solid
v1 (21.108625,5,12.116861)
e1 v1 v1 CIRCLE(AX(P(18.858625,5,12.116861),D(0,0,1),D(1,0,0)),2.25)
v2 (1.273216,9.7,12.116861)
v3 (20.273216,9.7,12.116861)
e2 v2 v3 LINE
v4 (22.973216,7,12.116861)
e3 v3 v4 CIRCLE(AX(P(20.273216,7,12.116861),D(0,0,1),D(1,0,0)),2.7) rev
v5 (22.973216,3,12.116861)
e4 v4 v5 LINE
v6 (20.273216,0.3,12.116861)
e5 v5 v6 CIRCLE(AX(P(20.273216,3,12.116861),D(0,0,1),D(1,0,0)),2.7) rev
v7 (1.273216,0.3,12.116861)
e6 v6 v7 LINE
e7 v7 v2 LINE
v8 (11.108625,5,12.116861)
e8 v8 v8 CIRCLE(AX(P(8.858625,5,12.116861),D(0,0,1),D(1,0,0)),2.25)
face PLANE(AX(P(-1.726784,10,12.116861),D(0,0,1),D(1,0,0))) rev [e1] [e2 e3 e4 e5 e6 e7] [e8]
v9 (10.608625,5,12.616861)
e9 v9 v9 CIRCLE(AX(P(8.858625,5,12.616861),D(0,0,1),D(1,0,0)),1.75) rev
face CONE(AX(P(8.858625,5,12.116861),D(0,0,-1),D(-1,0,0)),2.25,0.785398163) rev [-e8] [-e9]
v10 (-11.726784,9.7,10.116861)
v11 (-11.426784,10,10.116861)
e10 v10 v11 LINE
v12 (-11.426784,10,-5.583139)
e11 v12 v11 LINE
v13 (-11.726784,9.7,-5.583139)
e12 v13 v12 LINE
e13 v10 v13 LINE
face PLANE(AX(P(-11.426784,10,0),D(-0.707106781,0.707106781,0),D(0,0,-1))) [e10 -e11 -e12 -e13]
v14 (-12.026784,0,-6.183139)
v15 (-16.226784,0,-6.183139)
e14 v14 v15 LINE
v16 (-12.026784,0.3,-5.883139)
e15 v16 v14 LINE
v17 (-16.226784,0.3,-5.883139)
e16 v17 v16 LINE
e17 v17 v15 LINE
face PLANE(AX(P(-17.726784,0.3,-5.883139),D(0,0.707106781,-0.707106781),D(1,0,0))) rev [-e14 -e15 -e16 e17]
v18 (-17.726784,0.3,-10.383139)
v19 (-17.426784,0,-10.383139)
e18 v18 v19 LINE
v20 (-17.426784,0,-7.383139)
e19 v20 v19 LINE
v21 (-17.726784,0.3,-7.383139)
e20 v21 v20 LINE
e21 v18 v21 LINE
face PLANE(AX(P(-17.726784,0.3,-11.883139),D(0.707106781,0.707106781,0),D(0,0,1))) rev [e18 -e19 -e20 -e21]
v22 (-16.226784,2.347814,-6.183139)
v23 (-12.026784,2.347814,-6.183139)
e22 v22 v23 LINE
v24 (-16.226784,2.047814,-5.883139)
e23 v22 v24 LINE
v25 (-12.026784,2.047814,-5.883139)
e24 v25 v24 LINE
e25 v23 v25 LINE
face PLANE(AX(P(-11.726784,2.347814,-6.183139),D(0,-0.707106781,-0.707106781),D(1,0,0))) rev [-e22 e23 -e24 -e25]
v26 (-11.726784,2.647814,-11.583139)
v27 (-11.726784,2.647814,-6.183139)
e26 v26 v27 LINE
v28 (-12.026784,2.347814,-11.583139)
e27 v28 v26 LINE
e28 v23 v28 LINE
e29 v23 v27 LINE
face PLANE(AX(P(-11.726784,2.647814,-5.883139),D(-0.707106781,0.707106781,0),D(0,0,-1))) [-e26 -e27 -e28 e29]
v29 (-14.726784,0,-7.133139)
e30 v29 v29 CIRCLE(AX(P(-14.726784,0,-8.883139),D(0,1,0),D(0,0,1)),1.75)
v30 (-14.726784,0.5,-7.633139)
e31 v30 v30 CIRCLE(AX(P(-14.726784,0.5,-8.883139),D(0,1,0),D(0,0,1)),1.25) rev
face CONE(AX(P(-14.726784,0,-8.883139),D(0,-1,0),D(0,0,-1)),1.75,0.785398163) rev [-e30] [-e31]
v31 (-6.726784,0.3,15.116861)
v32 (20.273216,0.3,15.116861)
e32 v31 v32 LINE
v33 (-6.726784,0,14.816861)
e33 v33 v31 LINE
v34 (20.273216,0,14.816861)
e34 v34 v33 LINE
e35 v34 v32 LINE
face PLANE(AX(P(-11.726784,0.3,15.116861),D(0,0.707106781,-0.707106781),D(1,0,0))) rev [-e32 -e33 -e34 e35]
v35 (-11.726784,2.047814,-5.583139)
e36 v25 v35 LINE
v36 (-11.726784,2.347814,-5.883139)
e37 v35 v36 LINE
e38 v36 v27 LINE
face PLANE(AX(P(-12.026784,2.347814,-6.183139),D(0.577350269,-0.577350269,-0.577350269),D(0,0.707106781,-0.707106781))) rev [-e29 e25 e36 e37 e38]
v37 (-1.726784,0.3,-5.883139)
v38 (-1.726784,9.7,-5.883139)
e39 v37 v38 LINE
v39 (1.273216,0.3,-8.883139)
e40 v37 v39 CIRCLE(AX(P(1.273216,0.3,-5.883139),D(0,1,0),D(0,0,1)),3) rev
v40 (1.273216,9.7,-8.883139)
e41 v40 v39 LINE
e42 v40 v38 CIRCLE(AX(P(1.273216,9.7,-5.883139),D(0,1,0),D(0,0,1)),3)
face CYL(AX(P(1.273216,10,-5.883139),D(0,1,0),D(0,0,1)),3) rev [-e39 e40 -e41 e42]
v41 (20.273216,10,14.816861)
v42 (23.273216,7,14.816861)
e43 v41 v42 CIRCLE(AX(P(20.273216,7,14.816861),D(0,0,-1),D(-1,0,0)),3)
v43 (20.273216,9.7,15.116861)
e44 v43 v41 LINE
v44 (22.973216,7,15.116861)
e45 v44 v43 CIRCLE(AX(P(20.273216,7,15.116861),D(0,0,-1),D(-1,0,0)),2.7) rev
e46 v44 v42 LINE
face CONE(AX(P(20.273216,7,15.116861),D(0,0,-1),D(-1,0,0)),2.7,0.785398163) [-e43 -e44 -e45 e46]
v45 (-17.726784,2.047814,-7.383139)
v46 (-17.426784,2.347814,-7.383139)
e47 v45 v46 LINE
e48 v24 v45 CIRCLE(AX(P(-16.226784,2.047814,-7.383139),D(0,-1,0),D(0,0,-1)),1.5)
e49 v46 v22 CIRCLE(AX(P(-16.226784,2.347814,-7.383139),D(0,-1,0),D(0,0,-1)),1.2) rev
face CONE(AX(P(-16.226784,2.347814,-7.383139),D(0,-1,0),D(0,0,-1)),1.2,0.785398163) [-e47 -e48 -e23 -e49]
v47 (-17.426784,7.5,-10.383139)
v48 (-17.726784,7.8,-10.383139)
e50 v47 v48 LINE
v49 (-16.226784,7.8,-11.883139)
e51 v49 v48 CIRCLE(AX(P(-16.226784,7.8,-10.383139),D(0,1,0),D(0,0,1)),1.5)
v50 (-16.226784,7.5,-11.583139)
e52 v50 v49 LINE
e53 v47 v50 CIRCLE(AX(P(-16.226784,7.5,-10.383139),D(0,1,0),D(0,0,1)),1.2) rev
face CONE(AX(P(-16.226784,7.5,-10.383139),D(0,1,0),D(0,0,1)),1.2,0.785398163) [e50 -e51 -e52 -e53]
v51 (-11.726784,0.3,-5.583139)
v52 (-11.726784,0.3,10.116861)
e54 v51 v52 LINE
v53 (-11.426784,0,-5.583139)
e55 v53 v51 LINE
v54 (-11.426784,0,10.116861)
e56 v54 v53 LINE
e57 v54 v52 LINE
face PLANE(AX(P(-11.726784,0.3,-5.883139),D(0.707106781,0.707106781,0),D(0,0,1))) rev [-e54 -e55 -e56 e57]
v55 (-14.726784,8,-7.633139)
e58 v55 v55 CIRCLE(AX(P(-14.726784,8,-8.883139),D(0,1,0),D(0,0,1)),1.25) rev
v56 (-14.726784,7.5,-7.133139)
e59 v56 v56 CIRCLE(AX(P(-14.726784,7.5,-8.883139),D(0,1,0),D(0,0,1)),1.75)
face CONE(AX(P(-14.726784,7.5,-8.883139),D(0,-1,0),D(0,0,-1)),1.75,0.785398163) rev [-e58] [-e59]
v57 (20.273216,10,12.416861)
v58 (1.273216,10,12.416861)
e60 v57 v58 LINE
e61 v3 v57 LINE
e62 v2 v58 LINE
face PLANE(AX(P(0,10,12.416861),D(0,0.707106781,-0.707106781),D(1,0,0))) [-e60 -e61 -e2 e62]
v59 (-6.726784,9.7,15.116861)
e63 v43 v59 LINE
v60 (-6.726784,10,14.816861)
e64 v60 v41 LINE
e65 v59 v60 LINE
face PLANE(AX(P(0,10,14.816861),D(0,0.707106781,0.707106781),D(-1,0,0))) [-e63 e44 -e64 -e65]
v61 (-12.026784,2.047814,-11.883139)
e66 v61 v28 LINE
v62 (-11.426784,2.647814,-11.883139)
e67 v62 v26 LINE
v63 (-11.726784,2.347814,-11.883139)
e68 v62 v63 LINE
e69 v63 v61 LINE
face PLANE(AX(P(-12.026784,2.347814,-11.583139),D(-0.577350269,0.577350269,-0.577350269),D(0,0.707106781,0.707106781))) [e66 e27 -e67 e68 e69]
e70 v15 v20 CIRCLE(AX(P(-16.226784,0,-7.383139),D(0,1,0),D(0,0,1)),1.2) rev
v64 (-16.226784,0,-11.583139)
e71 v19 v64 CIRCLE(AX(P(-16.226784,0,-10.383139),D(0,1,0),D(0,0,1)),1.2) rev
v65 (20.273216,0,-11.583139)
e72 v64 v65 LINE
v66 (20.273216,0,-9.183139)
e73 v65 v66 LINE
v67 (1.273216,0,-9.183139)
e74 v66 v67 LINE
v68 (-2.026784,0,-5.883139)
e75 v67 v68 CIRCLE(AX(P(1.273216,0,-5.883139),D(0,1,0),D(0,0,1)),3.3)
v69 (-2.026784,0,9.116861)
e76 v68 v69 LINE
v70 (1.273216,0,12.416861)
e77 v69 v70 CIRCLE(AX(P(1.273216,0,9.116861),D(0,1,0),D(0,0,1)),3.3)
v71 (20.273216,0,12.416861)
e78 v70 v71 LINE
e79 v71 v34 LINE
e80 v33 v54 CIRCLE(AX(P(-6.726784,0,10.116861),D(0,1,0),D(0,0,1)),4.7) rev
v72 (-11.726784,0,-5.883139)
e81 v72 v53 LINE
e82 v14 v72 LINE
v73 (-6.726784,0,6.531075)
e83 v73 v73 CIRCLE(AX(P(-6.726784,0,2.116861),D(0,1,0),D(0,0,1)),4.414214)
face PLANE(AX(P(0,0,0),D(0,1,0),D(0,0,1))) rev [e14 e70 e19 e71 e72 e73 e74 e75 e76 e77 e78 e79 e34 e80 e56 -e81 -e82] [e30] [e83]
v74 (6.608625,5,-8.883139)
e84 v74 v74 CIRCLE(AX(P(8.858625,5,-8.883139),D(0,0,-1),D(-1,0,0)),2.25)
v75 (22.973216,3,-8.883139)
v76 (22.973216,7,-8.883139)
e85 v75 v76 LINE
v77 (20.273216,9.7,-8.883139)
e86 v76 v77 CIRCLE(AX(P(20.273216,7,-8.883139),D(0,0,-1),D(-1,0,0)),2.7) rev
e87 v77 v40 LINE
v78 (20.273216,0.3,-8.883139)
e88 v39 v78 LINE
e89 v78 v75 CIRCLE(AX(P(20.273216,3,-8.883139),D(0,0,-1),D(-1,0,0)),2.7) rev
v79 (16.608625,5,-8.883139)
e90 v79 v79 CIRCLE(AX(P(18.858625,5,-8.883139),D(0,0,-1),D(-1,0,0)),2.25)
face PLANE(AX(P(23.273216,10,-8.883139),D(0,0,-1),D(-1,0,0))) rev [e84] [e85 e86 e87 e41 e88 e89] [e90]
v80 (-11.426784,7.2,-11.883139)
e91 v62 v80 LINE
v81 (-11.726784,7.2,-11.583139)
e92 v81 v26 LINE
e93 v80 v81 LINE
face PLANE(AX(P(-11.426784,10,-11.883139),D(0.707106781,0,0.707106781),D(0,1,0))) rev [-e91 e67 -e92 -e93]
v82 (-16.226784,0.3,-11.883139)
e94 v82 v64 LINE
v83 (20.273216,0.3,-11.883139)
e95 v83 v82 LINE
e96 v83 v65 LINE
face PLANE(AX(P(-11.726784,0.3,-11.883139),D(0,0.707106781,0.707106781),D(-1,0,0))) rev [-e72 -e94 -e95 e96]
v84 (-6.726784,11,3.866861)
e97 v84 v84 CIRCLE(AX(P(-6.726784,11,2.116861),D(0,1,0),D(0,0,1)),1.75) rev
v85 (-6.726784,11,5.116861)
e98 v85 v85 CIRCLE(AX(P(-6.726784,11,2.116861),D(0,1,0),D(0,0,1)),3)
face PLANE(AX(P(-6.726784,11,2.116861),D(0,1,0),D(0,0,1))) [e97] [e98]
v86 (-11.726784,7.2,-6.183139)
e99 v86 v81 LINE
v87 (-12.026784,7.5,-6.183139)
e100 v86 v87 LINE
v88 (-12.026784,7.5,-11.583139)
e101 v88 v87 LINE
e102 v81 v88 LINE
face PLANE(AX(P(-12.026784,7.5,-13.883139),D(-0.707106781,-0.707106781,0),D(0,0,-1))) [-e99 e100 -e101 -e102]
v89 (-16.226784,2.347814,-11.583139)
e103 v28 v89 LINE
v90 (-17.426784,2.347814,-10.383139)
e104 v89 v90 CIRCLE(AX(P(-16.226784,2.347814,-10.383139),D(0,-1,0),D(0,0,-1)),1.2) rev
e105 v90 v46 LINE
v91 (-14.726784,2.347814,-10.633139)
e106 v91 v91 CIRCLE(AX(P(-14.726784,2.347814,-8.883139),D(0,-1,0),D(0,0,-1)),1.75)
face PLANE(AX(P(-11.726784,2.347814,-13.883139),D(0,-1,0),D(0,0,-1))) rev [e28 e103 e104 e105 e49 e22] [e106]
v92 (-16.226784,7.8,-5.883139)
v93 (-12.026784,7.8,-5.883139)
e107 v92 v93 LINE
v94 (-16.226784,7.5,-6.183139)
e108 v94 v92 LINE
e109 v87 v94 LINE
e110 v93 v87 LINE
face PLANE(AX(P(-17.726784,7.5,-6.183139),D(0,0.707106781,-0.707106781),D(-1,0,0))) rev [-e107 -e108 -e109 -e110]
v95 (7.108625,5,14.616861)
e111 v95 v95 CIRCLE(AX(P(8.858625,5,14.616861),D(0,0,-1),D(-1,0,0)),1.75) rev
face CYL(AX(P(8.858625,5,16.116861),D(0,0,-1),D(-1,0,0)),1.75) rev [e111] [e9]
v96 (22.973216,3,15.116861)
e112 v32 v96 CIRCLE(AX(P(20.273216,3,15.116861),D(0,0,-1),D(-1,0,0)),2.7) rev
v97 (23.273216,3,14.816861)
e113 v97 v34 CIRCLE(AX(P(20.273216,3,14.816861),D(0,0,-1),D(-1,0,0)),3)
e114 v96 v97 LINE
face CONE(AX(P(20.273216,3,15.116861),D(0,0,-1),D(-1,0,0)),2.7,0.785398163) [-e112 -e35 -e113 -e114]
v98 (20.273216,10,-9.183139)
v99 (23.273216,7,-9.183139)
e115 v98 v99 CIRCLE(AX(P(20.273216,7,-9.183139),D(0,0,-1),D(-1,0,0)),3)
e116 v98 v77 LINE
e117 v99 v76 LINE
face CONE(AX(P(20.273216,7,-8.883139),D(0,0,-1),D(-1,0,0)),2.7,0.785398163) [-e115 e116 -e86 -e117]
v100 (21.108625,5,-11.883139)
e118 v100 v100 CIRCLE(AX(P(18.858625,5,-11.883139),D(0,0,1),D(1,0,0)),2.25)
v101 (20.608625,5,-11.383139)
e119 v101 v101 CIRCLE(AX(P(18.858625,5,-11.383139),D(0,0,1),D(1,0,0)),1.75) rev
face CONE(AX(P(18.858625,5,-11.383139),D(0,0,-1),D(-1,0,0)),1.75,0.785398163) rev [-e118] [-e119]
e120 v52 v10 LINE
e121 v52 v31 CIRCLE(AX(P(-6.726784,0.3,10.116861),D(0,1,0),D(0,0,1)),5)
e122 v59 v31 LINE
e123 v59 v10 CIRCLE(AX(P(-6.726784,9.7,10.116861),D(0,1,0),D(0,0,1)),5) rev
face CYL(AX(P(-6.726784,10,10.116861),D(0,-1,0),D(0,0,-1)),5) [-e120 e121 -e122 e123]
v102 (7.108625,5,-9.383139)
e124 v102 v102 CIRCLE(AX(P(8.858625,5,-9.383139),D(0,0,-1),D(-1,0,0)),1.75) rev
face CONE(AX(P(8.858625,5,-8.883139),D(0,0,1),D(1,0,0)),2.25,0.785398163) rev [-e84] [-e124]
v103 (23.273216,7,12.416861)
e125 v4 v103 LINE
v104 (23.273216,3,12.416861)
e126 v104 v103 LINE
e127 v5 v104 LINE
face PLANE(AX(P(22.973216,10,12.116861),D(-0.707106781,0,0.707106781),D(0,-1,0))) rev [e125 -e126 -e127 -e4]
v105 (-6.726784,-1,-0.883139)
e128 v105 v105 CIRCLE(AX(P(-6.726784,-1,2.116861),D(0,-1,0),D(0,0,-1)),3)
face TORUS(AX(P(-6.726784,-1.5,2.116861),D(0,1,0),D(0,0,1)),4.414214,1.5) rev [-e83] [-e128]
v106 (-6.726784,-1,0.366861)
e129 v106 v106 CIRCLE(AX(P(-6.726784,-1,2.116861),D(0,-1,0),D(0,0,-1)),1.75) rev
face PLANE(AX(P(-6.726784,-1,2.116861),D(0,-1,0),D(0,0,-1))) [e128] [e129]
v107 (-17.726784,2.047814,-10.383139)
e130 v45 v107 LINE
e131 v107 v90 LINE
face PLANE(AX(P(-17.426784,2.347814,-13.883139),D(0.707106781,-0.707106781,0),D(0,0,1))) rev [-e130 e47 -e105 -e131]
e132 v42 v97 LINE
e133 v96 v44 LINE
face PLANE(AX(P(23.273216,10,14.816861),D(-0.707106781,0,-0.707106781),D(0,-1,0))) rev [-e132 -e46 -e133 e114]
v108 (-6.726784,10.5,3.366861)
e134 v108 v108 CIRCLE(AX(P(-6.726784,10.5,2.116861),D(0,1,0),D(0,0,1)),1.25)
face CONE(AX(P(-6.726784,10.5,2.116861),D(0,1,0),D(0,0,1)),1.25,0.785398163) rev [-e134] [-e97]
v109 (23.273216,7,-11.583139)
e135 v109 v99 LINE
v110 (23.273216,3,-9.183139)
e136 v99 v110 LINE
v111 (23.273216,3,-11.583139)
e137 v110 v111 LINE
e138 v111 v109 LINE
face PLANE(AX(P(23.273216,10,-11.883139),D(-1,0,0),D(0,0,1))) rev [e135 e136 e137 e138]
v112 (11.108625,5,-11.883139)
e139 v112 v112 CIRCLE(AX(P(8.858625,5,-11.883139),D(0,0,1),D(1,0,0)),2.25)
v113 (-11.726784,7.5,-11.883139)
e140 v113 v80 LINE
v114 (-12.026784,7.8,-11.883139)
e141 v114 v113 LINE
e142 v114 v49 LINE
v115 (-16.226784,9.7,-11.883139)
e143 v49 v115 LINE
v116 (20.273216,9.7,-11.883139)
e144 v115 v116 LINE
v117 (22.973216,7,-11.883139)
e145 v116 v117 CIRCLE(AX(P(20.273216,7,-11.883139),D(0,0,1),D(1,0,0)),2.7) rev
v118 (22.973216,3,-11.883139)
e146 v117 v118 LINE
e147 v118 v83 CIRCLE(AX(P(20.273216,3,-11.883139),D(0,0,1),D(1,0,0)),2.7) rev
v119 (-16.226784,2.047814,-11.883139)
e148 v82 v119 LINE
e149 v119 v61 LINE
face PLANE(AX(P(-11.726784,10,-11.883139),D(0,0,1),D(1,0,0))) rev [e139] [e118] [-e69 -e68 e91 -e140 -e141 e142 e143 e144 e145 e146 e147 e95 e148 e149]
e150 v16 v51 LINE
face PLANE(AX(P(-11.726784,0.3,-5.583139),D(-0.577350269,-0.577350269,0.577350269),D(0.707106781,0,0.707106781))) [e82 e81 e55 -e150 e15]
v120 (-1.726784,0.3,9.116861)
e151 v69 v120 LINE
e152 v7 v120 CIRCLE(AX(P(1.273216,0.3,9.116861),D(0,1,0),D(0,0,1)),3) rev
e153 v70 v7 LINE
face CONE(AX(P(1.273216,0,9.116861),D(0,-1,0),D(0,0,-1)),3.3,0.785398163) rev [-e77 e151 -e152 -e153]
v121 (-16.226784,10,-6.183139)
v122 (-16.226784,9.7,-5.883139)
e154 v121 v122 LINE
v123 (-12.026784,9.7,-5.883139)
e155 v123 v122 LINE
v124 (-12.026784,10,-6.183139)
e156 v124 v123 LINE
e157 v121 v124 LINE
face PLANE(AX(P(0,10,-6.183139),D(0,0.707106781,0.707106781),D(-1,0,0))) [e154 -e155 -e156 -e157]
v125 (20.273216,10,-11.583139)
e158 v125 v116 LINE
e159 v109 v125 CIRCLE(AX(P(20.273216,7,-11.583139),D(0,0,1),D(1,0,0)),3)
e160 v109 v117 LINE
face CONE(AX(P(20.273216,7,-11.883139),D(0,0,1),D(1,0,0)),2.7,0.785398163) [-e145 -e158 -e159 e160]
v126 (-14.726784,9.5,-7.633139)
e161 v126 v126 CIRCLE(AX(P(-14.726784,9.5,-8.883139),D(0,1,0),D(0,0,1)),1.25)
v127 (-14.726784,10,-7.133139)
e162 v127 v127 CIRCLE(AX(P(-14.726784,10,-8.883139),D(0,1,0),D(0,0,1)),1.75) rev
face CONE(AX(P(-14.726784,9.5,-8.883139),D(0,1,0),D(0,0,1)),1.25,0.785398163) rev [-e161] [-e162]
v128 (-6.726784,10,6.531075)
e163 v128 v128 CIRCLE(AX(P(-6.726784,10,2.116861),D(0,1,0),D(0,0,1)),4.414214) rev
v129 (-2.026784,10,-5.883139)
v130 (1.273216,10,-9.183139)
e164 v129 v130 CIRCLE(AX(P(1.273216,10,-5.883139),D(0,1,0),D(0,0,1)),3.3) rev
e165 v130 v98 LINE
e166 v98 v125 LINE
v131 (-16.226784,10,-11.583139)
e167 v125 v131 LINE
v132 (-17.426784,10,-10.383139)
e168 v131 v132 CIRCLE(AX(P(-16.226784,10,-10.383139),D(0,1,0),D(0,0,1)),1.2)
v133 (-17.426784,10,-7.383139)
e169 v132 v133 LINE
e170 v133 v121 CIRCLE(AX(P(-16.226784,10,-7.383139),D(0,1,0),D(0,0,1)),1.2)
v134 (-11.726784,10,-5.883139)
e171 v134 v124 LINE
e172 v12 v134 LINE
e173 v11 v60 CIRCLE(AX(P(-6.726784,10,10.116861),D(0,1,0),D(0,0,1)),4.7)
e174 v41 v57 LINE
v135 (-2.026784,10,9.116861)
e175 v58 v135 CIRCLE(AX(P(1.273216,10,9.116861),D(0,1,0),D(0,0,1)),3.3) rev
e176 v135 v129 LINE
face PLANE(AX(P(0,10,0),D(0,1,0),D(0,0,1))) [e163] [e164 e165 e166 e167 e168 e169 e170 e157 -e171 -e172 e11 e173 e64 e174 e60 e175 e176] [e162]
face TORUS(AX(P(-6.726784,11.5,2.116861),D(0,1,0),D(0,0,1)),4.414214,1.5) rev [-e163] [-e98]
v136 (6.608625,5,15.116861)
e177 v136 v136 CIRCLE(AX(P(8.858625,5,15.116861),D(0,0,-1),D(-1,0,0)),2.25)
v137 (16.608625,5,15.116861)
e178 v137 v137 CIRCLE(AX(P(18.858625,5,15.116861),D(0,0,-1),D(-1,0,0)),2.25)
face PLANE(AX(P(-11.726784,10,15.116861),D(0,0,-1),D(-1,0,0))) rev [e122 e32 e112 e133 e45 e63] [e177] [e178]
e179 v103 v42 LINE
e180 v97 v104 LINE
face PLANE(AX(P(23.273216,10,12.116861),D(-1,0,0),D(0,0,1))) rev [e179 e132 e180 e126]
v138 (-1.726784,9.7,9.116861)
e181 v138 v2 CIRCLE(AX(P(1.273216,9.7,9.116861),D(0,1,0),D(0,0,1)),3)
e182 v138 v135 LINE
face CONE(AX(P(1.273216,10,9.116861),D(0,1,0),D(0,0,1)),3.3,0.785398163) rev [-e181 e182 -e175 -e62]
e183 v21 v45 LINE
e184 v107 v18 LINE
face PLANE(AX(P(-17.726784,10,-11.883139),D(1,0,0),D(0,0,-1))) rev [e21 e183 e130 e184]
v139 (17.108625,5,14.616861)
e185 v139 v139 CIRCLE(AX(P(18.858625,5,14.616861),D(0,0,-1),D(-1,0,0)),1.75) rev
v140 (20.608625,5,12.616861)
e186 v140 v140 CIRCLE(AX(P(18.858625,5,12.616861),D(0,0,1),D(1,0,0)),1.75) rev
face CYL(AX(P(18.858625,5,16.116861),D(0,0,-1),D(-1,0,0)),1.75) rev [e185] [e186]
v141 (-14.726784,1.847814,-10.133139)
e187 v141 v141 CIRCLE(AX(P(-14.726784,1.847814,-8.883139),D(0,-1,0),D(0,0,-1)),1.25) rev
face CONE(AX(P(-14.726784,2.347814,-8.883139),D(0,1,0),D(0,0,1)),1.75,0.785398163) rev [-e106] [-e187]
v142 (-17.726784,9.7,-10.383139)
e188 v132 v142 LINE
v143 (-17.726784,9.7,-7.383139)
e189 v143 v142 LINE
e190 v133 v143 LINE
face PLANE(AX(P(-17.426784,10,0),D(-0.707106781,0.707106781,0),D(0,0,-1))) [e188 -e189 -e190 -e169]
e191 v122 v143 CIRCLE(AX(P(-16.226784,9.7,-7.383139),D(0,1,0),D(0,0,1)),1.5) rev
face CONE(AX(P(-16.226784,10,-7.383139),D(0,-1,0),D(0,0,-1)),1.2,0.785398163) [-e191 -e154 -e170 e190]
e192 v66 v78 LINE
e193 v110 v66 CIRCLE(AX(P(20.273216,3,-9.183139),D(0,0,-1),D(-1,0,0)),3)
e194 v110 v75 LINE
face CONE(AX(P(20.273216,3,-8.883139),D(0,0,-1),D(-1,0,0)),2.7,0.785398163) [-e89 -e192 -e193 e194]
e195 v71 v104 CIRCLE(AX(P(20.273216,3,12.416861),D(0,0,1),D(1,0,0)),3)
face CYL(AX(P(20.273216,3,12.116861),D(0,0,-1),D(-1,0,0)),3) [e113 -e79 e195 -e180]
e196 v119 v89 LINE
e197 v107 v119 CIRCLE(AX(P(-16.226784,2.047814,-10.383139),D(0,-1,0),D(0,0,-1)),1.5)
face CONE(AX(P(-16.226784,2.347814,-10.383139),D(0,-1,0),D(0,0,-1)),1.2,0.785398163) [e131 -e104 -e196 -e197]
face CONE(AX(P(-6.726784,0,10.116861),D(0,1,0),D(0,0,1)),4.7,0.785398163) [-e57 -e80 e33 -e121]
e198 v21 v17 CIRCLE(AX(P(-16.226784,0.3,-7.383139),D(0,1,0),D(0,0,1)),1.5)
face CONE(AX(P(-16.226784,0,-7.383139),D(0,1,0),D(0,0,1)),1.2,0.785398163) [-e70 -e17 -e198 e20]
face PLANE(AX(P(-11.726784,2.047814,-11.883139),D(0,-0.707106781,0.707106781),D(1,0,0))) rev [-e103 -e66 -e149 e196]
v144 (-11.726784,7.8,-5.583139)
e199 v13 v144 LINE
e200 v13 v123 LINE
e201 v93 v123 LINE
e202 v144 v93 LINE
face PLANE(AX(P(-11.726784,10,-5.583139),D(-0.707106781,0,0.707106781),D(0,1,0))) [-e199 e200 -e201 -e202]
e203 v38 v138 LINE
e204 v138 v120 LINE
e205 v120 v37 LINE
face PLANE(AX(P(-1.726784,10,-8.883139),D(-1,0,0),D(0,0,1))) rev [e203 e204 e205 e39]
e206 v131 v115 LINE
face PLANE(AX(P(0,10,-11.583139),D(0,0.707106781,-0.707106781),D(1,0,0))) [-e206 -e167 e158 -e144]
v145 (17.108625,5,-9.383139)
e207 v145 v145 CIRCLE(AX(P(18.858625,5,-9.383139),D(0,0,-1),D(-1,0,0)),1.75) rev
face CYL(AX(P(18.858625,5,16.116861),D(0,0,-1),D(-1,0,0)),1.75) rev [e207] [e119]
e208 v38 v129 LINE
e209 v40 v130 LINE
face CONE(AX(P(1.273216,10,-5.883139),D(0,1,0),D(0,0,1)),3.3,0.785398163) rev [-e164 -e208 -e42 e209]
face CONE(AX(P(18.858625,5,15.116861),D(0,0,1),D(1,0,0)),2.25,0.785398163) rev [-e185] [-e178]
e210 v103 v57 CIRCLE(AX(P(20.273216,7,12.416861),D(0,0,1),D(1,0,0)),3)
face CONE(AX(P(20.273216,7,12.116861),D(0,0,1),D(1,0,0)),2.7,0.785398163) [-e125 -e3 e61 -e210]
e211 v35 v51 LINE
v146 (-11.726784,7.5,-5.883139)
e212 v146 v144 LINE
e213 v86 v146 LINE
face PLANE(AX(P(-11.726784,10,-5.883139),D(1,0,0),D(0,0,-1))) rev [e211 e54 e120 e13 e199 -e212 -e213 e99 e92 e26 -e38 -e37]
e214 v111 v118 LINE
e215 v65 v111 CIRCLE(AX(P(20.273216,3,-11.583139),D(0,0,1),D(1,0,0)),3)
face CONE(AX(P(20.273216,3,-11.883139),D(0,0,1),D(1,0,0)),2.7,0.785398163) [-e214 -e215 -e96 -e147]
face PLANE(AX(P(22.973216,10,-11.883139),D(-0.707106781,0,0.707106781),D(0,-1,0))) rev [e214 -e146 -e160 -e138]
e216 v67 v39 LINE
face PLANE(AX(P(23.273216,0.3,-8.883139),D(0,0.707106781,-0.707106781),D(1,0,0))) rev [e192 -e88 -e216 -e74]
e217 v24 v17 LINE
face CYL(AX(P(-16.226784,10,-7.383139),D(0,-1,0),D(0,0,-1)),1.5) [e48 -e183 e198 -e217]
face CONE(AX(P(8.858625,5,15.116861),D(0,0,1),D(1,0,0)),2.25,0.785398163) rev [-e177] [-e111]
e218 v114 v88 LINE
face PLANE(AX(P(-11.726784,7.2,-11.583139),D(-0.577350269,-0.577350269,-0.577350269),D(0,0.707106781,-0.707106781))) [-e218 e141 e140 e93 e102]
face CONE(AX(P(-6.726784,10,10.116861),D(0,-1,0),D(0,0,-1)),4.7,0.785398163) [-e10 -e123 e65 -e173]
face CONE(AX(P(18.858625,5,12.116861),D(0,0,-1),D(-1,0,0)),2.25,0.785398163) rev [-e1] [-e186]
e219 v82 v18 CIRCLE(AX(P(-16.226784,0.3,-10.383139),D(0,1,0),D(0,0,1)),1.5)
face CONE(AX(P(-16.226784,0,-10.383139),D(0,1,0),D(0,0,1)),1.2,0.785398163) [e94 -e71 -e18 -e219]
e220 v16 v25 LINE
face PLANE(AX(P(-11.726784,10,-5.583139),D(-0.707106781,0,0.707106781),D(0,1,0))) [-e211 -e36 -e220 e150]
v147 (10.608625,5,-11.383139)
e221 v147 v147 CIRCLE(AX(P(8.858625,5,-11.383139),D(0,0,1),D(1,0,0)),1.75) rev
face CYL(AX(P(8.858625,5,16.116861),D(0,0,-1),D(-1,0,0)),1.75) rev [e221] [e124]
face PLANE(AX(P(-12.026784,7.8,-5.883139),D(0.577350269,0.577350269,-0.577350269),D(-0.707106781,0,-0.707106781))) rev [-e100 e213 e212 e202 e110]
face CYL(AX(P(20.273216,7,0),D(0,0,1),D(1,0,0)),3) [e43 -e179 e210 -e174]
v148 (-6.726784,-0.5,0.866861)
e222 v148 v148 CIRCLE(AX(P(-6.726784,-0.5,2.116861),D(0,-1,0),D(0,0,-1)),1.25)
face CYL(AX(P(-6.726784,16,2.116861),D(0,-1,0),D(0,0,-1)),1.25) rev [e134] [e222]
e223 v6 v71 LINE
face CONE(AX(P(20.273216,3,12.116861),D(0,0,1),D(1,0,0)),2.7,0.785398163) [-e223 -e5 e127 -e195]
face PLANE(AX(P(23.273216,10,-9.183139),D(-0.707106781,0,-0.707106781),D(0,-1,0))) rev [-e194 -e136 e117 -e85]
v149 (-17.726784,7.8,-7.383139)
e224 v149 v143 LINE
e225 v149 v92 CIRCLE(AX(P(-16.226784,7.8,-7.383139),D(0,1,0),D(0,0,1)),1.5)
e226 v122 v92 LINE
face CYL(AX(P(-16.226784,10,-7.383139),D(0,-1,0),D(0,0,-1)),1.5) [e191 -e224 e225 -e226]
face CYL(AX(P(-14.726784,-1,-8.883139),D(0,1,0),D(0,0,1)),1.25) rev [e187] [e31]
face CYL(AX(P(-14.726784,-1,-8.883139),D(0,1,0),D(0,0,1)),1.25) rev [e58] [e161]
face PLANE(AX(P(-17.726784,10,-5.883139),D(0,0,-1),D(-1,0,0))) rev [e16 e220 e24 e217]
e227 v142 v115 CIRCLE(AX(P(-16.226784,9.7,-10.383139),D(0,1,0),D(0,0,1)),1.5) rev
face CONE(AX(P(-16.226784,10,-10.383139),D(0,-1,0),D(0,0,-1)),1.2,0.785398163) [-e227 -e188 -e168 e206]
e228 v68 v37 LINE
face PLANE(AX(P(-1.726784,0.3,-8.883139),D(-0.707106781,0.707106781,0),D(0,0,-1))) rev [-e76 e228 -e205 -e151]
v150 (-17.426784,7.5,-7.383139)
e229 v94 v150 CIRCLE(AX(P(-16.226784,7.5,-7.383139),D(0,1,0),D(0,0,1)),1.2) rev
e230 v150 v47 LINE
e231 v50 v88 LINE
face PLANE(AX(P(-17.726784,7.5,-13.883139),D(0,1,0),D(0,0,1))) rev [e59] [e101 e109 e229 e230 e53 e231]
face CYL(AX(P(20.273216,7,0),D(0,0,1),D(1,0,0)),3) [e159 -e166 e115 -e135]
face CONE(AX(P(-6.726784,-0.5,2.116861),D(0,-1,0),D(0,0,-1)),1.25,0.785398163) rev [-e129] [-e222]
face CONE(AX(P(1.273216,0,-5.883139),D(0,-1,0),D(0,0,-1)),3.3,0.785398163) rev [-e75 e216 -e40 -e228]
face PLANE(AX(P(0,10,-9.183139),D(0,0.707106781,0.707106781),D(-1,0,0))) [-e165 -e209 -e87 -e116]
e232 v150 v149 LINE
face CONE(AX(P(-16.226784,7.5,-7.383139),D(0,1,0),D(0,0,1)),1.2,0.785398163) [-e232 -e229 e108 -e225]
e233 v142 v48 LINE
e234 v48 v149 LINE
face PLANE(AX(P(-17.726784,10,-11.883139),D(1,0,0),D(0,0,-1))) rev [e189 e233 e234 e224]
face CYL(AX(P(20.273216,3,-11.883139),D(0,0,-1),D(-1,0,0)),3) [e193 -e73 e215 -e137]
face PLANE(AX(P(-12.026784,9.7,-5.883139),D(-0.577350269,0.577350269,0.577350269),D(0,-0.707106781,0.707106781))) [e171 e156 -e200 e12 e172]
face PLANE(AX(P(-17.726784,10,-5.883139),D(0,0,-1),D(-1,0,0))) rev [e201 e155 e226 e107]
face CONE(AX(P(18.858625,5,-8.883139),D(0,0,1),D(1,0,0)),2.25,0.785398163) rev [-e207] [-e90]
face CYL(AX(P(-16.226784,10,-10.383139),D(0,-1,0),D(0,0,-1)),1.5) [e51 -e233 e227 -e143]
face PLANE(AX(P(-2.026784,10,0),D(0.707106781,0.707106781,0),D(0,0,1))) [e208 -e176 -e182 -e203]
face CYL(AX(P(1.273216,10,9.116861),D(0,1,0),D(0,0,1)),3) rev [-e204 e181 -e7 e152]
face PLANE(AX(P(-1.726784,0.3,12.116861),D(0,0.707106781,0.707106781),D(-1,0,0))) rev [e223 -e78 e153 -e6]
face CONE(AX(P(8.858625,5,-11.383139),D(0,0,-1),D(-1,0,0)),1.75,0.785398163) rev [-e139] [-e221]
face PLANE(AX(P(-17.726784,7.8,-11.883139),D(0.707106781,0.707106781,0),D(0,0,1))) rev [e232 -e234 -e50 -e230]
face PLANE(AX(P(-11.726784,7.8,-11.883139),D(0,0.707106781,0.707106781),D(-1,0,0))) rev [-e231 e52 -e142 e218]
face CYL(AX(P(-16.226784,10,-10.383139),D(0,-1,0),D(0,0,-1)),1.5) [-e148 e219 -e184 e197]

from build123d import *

# Parameters (mm, degrees)
EXTRUDE_1_DEPTH     = 10
SKETCH_2_R          = 1.75
CUT_EXTRUDE_1_DEPTH = 28
SKETCH_3_W          = 6
SKETCH_3_H          = 5.152186346
CUT_EXTRUDE_2_DEPTH = 8
SKETCH_4_R          = 1.25
CUT_EXTRUDE_3_DEPTH = 11
FILLET_1_R          = 3
FILLET_2_R          = 5
FILLET_3_R          = 1.5
SKETCH_5_R          = 3
EXTRUDE_2_DEPTH     = 1
EXTRUDE_START       = 1
SKETCH_6_R          = 3
EXTRUDE_3_DEPTH     = 1
FILLET_4_R          = 1.5
SKETCH_7_R          = 1.25
CUT_EXTRUDE_4_DEPTH = 17
CHAMFER_1_SIZE      = 0.5
FILLET_5_R          = 3
CHAMFER_2_SIZE      = 0.3


with BuildPart() as part:
    # 草图1 → 凸台-拉伸1 (new body)
    with BuildSketch(Plane(origin=(0, 0, 0), x_dir=(1, 0, 0), z_dir=(0, 1, 0))):
        Polygon((23.273216446, 11.883138654), (23.273216446, 8.883138654), (-1.726783554, 8.883138654), (-1.726783554, -12.116861346), (23.273216446, -12.116861346), (23.273216446, -15.116861346), (-11.726783554, -15.116861346), (-11.726783554, 5.883138654), (-17.726783554, 5.883138654), (-17.726783554, 11.883138654), (-11.726783554, 11.883138654), align=None)
    extrude(amount=EXTRUDE_1_DEPTH)

    # 草图2 → 切除-拉伸1 (cut)
    with BuildSketch(Plane(origin=(0, 0, -11.883138654), x_dir=(-1, 0, 0), z_dir=(0, 0, -1))):
        with Locations((-18.858625261, 5)):
            Circle(SKETCH_2_R)
        with Locations((-8.858625261, 5)):
            Circle(SKETCH_2_R)
    extrude(amount=-CUT_EXTRUDE_1_DEPTH, mode=Mode.SUBTRACT)

    # 草图3 → 切除-拉伸2 (cut)
    with BuildSketch(Plane.XY.offset(-5.883138654)):
        with Locations((-14.726783554, 4.923906827)):
            Rectangle(SKETCH_3_W, SKETCH_3_H)
    extrude(amount=-CUT_EXTRUDE_2_DEPTH, mode=Mode.SUBTRACT)

    # 草图4 → 切除-拉伸3 (cut)
    with BuildSketch(Plane(origin=(0, 10, 0), x_dir=(1, 0, 0), z_dir=(0, 1, 0))):
        with Locations(Location((-14.726783554, 8.883138654, 0), (0, 0, 270))):
            Circle(SKETCH_4_R)
    extrude(amount=-CUT_EXTRUDE_3_DEPTH, mode=Mode.SUBTRACT)

    # 圆角1
    fillet_1_edges = [part.edges().sort_by_distance(p)[0] for p in [
        (23.273216446, 0, -10.383138654),
        (23.273216446, 0, 13.616861346),
        (23.273216446, 10, 13.616861346),
        (23.273216446, 10, -10.383138654),
    ]]
    fillet(fillet_1_edges, radius=FILLET_1_R)

    # 圆角2
    fillet_2_edges = [part.edges().sort_by_distance(p)[0] for p in [
        (-11.726783554, 5, 15.116861346),
    ]]
    fillet(fillet_2_edges, radius=FILLET_2_R)

    # 圆角3
    fillet_3_edges = [part.edges().sort_by_distance(p)[0] for p in [
        (-17.726783554, 8.75, -5.883138654),
        (-17.726783554, 8.75, -11.883138654),
        (-17.726783554, 1.173906827, -11.883138654),
        (-17.726783554, 1.173906827, -5.883138654),
    ]]
    fillet(fillet_3_edges, radius=FILLET_3_R)

    # 草图5 → 凸台-拉伸2 (add)
    with BuildSketch(Plane.XZ):
        with Locations(Location((-6.726783554, 2.116861346, 0), (0, 0, 90))):
            Circle(SKETCH_5_R)
    extrude(amount=EXTRUDE_2_DEPTH)

    # 草图6 → 凸台-拉伸3 (add)
    with BuildSketch(Plane(origin=(0, 10, 0), x_dir=(1, 0, 0), z_dir=(0, 1, 0)).offset(EXTRUDE_START)):
        with Locations(Location((-6.726783554, -2.116861346, 0), (0, 0, 270))):
            Circle(SKETCH_6_R)
    extrude(amount=-EXTRUDE_3_DEPTH)

    # 圆角4
    # the kernel refuses this fillet: 1.5 mm, written as the material it adds along each edge
    with BuildSketch(Plane(origin=(-6.726783554, 0, 2.116861346), x_dir=(0, 0, 1), z_dir=(1, 0, 0))) as fillet_4_piece_1:
        with BuildLine():
            CenterArc((4.414213562, 1.5), FILLET_4_R, 199.471220634, 70.528779366)
            Line((3, 1), (2.971715729, 0.99))
            ThreePointArc((2.971715729, 0.99), (2.97, 0.5), (2.97, 0))
            Line((2.97, 0), (3, -0.03))
            Line((3, -0.03), (4.414213562, -0.03))
            Line((4.414213562, -0.03), (4.414213562, 0))
        make_face()
    revolve(axis=Axis((-6.726783554, 0, 2.116861346), (0, -1, 0)))
    with BuildSketch(Plane(origin=(-6.726783554, 10, 2.116861346), x_dir=(0, 0, 1), z_dir=(-1, 0, 0))) as fillet_4_piece_2:
        with BuildLine():
            CenterArc((4.414213562, 1.5), FILLET_4_R, 199.471220634, 70.528779366)
            Line((3, 1), (2.971715729, 0.99))
            ThreePointArc((2.971715729, 0.99), (2.97, 0.5), (2.97, 0))
            Line((2.97, 0), (3, -0.03))
            Line((3, -0.03), (4.414213562, -0.03))
            Line((4.414213562, -0.03), (4.414213562, 0))
        make_face()
    revolve(axis=Axis((-6.726783554, 10, 2.116861346), (0, 1, 0)))

    # 草图7 → 切除-拉伸4 (cut)
    with BuildSketch(Plane.XZ.offset(1)):
        with Locations(Location((-6.726783554, 2.116861346, 0), (0, 0, 270))):
            Circle(SKETCH_7_R)
    extrude(amount=-CUT_EXTRUDE_4_DEPTH, mode=Mode.SUBTRACT)

    # 倒角1
    chamfer_1_edges = [part.edges().sort_by_distance(p)[0] for p in [
        (-6.726783554, 11, 3.366861346),
        (-6.726783554, -1, 3.366861346),
        (20.608625261, 5, 12.116861346),
        (20.608625261, 5, 15.116861346),
        (20.608625261, 5, -8.883138654),
        (20.608625261, 5, -11.883138654),
        (10.608625261, 5, 12.116861346),
        (10.608625261, 5, 15.116861346),
        (10.608625261, 5, -8.883138654),
        (10.608625261, 5, -11.883138654),
        (-14.726783554, 2.347813654, -10.133138654),
        (-14.726783554, 0, -10.133138654),
        (-14.726783554, 7.5, -10.133138654),
        (-14.726783554, 10, -10.133138654),
    ]]
    chamfer(chamfer_1_edges, length=CHAMFER_1_SIZE)

    # 圆角5
    fillet_5_edges = [part.edges().sort_by_distance(p)[0] for p in [
        (-1.726783554, 5, -8.883138654),
        (-1.726783554, 5, 12.116861346),
    ]]
    fillet(fillet_5_edges, radius=FILLET_5_R)

    # 倒角2
    chamfer_2_edges = [part.edges().sort_by_distance(p)[0] for p in [
        (6.773216446, 0, 15.116861346),
        (6.773216446, 10, 15.116861346),
        (-10.26231746, 0, 13.652395252),
        (-10.26231746, 10, 13.652395252),
        (-13.976783554, 10, -5.883138654),
        (-17.726783554, 7.5, -8.883138654),
        (-17.287443726, 7.5, -11.443798826),
        (-17.287443726, 7.5, -6.322478482),
        (-17.726783554, 10, -8.883138654),
        (-17.287443726, 10, -11.443798826),
        (-17.287443726, 10, -6.322478482),
        (-13.976783554, 2.347813654, -5.883138654),
        (-13.976783554, 0, -5.883138654),
        (-17.726783554, 0, -8.883138654),
        (-17.287443726, 0, -11.443798826),
        (-17.287443726, 0, -6.322478482),
        (-17.726783554, 2.347813654, -8.883138654),
        (-13.976783554, 2.347813654, -11.883138654),
        (-17.287443726, 2.347813654, -11.443798826),
        (-17.287443726, 2.347813654, -6.322478482),
        (-11.726783554, 0, 2.116861346),
        (-11.726783554, 10, 2.116861346),
        (-11.726783554, 8.75, -5.883138654),
        (10.773216446, 0, -8.883138654),
        (10.773216446, 10, -8.883138654),
        (-1.726783554, 0, 1.616861346),
        (-1.726783554, 10, 1.616861346),
        (-0.848103898, 0, -8.004458997),
        (-0.848103898, 10, -8.004458997),
        (-0.848103898, 0, 11.23818169),
        (-0.848103898, 10, 11.23818169),
        (-11.726783554, 4.923906827, -11.883138654),
        (-13.976783554, 7.5, -11.883138654),
        (-11.726783554, 1.173906827, -5.883138654),
        (-11.726783554, 7.5, -8.883138654),
        (-11.726783554, 2.347813654, -8.883138654),
        (-13.976783554, 7.5, -5.883138654),
        (23.273216446, 5, 12.116861346),
        (23.273216446, 5, 15.116861346),
        (10.773216446, 0, 12.116861346),
        (10.773216446, 10, 12.116861346),
        (22.394536789, 9.121320344, 12.116861346),
        (22.394536789, 0.878679656, 12.116861346),
        (2.023216446, 0, -11.883138654),
        (22.394536789, 9.121320344, 15.116861346),
        (22.394536789, 0.878679656, 15.116861346),
        (2.023216446, 10, -11.883138654),
        (23.273216446, 5, -11.883138654),
        (23.273216446, 5, -8.883138654),
        (22.394536789, 9.121320344, -11.883138654),
        (22.394536789, 0.878679656, -11.883138654),
        (22.394536789, 9.121320344, -8.883138654),
        (22.394536789, 0.878679656, -8.883138654),
    ]]
    chamfer(chamfer_2_edges, length=CHAMFER_2_SIZE)


solid = part.part
